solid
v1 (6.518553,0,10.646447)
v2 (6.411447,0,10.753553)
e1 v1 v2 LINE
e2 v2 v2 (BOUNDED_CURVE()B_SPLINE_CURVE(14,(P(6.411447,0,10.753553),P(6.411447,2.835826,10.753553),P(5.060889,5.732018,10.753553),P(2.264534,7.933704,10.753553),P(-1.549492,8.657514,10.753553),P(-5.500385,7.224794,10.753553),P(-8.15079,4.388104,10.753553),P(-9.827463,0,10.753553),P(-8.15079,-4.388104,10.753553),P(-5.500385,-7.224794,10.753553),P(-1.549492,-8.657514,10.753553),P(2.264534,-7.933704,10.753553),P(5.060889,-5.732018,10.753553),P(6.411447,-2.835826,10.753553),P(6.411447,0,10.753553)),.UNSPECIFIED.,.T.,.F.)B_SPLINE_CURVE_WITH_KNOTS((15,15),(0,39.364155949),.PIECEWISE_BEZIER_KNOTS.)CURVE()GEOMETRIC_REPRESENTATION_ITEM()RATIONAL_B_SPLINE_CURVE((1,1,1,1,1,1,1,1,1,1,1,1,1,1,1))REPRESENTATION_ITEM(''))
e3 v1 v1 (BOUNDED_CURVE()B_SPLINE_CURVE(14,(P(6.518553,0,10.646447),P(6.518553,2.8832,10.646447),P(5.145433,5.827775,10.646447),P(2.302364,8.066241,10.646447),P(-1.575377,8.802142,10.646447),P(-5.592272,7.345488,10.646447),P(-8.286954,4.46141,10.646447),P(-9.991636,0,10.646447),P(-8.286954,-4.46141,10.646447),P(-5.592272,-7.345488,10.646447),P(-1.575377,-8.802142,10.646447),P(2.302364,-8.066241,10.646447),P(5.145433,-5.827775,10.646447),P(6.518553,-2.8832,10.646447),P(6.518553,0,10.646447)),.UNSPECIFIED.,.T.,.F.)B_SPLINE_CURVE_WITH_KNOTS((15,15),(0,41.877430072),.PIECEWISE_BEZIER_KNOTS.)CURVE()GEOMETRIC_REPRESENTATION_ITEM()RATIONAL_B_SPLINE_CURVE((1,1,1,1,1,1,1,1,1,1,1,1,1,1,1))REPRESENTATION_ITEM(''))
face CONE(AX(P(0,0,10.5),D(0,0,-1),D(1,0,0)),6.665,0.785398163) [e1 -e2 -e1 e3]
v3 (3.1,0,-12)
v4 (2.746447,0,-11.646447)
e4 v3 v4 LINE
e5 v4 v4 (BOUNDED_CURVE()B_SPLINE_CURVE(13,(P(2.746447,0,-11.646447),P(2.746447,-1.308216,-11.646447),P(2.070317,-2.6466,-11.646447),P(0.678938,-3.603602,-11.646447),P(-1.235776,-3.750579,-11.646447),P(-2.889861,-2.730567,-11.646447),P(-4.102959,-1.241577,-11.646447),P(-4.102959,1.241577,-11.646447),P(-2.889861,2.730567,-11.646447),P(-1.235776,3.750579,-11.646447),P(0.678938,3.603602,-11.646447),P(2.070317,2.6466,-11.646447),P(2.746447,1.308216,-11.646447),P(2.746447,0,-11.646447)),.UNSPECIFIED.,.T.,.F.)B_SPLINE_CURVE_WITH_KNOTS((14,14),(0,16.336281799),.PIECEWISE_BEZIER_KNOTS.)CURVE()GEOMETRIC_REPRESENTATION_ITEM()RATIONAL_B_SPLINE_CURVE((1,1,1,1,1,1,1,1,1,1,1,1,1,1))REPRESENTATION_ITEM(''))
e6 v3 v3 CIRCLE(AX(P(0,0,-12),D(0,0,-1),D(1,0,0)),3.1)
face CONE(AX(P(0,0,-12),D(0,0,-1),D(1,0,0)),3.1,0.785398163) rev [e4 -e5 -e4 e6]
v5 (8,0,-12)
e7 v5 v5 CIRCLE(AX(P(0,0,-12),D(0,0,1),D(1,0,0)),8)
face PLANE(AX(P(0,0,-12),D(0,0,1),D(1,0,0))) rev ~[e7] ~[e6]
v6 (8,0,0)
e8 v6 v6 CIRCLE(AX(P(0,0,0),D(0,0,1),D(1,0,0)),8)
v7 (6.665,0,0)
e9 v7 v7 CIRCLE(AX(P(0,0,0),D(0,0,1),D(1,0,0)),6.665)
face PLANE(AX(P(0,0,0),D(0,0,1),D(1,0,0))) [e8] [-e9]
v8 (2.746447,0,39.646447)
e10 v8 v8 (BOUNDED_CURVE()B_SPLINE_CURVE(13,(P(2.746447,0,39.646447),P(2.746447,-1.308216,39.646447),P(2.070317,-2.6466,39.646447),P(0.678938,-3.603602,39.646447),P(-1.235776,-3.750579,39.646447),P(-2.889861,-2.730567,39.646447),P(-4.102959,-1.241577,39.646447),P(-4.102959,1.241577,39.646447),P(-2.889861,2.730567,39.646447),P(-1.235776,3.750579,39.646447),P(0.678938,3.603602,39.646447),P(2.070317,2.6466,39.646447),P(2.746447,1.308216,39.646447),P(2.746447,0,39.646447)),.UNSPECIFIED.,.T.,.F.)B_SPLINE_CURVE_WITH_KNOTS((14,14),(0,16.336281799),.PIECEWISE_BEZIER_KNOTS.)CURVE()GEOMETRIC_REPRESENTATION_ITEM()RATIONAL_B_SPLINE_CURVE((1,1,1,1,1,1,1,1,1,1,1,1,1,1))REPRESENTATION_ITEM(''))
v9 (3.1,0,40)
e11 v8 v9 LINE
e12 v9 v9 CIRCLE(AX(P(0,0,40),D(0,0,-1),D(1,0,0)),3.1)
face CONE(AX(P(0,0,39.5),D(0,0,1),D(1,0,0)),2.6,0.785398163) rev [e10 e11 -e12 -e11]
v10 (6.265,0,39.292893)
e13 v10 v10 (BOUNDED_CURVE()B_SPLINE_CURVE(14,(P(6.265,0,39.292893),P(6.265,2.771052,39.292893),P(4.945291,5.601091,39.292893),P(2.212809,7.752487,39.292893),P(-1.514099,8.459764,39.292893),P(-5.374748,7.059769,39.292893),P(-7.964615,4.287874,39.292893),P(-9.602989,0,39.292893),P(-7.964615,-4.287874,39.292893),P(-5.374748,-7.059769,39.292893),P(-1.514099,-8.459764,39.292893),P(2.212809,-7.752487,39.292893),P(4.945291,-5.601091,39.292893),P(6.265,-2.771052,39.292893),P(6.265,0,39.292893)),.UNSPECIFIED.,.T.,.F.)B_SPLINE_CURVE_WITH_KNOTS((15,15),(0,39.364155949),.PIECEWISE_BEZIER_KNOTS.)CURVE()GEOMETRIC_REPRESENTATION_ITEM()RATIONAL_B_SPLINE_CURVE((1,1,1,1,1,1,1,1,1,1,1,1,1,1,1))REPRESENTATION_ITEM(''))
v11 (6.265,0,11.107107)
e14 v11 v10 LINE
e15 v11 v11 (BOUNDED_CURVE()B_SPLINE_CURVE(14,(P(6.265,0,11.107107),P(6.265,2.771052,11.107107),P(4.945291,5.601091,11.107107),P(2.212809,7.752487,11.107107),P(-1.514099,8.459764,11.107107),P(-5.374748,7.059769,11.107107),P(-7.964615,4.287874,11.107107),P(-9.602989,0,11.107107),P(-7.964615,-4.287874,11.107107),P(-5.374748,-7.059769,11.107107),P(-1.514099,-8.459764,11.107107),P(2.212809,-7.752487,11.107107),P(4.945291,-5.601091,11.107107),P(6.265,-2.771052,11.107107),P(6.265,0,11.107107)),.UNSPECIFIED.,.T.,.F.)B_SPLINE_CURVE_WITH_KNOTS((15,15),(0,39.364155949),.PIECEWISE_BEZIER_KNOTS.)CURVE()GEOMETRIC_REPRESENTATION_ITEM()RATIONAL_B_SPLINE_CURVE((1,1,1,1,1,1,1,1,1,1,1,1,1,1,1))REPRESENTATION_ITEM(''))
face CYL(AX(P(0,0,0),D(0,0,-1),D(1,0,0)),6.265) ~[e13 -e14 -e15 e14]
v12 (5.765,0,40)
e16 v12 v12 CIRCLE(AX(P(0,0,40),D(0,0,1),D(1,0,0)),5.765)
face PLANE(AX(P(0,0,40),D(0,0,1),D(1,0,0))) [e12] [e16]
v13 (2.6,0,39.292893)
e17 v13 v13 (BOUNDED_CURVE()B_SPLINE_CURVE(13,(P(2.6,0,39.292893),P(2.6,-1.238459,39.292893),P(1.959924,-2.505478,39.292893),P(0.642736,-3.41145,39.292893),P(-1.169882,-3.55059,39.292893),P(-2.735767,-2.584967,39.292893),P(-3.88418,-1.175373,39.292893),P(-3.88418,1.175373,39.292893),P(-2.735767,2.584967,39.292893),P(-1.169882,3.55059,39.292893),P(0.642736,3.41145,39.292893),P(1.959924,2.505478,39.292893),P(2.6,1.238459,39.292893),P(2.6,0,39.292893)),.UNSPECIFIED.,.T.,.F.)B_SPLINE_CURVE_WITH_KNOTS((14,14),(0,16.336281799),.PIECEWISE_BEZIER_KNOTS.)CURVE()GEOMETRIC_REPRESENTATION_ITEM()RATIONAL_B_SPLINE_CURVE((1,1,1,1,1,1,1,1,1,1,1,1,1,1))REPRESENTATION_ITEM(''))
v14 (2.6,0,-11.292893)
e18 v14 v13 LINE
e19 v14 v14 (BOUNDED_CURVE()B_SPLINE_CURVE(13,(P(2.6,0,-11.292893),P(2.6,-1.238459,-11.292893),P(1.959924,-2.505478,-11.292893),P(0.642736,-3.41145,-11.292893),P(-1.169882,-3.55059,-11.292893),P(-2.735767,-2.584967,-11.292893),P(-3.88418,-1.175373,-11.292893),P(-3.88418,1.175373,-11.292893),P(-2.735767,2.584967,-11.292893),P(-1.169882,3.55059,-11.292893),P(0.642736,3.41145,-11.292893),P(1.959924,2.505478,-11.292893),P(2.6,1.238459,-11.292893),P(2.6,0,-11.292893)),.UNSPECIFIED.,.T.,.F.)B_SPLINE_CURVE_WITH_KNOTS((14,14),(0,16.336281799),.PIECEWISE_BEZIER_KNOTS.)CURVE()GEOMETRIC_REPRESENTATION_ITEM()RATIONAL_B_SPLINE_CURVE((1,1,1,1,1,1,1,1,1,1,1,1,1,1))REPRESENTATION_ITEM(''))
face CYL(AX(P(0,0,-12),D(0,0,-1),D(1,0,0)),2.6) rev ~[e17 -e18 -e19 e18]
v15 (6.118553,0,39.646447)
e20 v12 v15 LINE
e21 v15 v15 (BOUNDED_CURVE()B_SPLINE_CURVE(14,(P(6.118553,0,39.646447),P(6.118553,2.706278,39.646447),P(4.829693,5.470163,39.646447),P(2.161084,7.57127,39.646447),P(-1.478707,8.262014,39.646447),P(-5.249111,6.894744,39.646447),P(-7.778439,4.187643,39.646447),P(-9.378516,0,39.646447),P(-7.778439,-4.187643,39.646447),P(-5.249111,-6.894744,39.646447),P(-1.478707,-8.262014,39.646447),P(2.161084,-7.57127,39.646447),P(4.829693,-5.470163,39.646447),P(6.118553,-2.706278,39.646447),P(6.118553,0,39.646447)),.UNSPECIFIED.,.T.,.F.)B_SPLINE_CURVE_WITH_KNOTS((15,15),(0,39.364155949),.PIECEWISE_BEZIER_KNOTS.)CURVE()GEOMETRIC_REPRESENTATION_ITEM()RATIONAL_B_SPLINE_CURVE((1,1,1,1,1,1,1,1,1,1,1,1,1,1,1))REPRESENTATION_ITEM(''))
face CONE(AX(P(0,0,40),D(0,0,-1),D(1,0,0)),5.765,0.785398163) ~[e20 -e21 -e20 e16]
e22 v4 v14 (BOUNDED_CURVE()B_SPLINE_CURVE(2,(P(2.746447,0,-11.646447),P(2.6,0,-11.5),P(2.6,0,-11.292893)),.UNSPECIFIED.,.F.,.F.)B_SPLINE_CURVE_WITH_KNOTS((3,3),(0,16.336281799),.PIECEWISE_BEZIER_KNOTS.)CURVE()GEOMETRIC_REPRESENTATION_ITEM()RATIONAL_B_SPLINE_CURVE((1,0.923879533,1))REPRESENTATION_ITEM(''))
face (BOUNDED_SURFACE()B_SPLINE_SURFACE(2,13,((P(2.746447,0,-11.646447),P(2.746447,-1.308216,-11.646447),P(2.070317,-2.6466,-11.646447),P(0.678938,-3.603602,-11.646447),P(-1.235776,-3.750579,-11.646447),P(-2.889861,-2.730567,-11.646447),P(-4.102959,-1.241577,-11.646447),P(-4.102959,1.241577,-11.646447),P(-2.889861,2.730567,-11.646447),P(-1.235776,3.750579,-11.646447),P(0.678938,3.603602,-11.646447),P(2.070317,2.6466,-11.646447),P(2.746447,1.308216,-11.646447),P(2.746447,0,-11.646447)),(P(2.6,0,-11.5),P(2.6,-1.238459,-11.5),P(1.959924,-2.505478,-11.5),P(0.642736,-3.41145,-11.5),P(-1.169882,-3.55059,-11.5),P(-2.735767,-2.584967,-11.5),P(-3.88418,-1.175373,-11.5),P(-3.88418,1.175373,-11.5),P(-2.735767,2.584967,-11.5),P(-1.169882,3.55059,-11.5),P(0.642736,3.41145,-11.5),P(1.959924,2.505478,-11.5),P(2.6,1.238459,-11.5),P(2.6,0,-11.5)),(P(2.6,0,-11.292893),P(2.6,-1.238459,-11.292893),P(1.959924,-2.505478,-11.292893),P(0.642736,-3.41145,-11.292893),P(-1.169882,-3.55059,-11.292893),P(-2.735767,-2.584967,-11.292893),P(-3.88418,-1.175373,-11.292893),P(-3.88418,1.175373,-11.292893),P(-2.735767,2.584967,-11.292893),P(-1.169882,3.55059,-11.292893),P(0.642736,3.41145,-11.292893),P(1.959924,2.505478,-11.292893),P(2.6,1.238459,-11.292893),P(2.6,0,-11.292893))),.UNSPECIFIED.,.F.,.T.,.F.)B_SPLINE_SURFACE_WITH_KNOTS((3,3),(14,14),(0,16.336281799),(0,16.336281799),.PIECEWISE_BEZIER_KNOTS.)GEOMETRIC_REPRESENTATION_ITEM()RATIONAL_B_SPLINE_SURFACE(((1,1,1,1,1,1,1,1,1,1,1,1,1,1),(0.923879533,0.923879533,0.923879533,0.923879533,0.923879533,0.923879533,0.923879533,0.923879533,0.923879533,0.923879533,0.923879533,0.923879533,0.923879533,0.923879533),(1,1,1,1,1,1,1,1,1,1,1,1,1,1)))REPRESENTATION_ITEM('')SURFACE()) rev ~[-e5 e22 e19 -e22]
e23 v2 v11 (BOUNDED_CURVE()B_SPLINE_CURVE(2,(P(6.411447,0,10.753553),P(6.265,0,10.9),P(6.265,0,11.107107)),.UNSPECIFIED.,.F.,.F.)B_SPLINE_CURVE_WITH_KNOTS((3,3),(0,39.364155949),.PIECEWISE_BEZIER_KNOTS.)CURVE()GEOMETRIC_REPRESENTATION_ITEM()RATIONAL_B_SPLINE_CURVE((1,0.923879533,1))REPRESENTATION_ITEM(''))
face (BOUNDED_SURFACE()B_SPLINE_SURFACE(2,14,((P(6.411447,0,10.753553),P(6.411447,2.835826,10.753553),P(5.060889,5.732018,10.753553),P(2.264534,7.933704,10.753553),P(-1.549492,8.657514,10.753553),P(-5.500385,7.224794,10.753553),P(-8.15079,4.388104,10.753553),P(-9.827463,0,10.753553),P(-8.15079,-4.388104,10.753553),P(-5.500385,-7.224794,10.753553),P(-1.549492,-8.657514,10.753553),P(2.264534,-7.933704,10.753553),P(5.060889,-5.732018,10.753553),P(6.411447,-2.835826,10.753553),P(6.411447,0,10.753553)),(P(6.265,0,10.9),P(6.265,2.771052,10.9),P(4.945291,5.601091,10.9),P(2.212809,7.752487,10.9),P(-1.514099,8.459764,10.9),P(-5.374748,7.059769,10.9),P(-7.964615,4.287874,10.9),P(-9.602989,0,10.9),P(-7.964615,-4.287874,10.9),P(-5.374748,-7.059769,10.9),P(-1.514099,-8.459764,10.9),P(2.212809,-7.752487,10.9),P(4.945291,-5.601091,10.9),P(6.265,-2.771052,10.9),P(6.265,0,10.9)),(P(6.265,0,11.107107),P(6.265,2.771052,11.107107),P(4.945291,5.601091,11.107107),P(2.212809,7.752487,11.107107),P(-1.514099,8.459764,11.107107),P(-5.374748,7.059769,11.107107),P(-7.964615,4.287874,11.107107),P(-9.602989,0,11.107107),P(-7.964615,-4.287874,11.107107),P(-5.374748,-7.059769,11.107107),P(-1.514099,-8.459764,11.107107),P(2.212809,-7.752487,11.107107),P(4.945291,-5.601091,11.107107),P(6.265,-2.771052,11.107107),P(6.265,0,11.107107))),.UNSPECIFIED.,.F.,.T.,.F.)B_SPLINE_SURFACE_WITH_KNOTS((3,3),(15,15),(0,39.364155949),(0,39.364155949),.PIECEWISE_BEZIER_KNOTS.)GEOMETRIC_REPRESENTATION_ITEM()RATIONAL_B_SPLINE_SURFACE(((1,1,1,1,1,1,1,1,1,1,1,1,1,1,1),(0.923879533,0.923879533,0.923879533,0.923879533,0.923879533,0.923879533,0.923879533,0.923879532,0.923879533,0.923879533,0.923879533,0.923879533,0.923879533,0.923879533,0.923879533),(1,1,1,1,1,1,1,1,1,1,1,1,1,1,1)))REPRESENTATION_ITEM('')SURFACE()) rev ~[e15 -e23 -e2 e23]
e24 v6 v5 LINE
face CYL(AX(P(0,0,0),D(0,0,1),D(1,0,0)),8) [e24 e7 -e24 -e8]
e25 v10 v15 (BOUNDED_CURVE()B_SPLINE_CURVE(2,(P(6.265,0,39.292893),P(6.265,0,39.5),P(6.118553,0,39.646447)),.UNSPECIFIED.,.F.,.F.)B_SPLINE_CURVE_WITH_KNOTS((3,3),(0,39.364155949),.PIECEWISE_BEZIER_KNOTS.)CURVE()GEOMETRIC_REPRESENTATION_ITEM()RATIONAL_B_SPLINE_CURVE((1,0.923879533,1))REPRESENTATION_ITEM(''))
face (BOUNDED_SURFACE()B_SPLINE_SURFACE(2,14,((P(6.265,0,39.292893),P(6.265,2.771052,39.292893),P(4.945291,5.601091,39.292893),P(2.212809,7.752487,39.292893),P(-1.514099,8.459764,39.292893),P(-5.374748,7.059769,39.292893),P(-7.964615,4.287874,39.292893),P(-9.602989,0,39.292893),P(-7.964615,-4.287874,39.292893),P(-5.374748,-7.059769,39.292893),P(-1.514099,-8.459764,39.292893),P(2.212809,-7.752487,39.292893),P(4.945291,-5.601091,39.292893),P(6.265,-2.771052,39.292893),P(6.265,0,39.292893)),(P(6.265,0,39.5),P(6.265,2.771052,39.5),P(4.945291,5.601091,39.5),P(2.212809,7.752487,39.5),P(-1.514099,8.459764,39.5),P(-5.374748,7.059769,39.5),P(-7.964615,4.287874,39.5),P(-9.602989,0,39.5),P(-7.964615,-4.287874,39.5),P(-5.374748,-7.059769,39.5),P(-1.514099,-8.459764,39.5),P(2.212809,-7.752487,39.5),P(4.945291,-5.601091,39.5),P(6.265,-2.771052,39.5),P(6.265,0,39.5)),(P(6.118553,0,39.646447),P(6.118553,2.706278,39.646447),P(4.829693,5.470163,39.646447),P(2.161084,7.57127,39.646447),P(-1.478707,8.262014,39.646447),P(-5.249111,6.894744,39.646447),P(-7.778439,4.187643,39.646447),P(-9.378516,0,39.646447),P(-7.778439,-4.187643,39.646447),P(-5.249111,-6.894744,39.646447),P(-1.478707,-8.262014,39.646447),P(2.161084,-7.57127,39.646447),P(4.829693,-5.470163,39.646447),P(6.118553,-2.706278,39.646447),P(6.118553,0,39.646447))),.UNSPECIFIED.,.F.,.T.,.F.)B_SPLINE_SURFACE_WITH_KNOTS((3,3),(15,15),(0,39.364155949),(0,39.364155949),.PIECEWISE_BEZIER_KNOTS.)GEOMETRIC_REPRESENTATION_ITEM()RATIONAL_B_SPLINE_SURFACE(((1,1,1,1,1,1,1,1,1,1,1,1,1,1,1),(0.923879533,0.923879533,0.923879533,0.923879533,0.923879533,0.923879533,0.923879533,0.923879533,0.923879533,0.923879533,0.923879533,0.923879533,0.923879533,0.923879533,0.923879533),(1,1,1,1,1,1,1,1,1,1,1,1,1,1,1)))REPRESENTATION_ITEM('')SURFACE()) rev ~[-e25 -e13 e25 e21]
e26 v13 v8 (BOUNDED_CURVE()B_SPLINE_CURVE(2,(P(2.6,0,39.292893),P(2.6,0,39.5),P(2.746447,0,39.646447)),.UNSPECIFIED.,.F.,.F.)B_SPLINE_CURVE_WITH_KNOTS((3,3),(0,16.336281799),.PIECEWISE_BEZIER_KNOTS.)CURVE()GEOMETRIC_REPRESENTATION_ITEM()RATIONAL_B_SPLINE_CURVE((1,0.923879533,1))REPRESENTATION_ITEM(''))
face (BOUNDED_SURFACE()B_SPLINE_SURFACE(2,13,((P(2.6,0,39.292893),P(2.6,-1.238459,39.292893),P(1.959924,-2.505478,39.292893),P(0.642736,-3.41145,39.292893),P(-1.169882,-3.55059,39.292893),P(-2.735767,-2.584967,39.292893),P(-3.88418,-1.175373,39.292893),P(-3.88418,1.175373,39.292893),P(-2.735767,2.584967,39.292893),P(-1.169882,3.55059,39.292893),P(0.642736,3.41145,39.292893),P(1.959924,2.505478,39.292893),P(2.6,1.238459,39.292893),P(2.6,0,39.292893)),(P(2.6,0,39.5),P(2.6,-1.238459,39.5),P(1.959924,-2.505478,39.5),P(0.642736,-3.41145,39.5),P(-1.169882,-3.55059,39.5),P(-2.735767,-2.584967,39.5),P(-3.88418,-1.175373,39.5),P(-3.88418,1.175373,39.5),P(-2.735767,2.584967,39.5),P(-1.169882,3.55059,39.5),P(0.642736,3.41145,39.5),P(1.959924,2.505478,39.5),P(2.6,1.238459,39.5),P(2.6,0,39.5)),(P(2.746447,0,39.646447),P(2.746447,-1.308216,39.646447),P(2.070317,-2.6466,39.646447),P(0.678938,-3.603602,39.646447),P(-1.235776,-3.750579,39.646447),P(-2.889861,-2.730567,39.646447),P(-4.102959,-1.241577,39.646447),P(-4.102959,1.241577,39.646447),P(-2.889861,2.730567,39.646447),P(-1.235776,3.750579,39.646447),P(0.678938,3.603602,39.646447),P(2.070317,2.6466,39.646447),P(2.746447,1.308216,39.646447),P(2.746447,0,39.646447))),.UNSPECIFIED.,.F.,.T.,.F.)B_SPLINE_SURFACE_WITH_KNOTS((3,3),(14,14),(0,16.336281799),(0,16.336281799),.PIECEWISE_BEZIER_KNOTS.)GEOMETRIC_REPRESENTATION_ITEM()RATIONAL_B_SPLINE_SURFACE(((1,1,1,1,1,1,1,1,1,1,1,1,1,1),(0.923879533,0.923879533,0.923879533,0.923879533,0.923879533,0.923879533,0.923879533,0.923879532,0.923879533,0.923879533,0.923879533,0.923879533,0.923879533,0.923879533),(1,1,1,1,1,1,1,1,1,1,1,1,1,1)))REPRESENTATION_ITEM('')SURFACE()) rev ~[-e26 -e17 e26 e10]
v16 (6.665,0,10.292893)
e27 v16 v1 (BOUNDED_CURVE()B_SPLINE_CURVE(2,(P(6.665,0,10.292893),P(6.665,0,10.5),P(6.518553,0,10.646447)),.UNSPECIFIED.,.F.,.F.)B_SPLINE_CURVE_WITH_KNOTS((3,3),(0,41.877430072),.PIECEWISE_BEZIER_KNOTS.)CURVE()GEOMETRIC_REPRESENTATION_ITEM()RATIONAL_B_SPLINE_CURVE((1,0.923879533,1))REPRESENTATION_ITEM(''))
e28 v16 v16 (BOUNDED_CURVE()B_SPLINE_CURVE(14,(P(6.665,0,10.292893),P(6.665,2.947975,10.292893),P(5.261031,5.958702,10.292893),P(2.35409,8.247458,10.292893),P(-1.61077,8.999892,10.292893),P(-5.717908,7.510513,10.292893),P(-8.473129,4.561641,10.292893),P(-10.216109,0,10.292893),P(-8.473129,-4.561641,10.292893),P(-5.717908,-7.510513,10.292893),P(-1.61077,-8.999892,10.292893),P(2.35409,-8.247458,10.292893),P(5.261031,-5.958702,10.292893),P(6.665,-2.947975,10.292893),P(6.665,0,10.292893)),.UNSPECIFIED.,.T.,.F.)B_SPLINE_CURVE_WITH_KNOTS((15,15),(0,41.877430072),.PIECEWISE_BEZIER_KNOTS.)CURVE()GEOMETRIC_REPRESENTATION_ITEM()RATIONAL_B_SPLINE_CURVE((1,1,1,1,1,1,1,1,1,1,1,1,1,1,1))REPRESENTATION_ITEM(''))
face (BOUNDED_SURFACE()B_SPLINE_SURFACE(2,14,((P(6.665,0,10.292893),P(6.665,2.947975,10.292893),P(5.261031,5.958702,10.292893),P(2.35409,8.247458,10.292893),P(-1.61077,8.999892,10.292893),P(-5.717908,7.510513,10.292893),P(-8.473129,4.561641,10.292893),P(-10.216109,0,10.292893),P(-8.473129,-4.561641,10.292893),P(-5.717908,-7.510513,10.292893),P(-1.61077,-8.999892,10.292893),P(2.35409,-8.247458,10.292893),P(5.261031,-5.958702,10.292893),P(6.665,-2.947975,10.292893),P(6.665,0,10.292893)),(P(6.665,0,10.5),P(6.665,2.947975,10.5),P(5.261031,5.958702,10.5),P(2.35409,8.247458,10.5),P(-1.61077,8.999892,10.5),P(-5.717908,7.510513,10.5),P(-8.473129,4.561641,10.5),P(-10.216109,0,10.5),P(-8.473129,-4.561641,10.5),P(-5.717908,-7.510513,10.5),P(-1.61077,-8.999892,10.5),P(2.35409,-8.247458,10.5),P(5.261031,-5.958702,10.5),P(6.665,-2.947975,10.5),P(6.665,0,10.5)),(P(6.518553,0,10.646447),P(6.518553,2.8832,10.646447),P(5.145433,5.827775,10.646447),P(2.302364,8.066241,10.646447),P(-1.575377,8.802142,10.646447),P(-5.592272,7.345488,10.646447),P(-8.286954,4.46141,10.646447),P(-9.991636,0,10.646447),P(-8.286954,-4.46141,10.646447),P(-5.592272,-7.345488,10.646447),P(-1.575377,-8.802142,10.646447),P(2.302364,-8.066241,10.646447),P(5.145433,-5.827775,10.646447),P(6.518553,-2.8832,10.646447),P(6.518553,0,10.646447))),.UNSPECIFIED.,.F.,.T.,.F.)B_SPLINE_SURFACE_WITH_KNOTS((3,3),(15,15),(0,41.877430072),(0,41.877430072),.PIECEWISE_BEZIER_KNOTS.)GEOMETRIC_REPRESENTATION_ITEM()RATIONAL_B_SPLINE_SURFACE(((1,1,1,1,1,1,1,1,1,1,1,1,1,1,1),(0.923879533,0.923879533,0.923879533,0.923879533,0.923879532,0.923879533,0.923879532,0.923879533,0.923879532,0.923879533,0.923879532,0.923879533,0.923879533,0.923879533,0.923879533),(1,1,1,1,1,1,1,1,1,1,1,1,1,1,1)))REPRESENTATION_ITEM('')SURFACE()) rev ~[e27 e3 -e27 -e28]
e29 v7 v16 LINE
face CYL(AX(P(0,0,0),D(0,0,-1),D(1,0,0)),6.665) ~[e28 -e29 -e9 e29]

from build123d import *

# Parameters (mm, degrees)
F0_R        = 6.665
F0_R_2      = 6.265
F1_DEPTH    = 11
F2_DEPTH    = 40
F0_R_3      = 8
F3_DEPTH    = 12
F4_R        = 2.6
F5_DEPTH    = 52
F6_S5_R     = 6.265
F6_T6_DEPTH = 11
F7_R        = 0.5
F8_R        = 0.5


# Not quite as in the source:
# - a fillet or chamfer that OpenCascade refuses, or shapes differently, is made with other operations: its cross-section is extruded or revolved along the edge and cut away or added


with BuildPart() as f1:
    # F0 (on Top) → F1 (new body)
    with BuildSketch(Plane.XY):
        Circle(F0_R)
        Circle(F0_R_2, mode=Mode.SUBTRACT)
        Circle(F0_R_2)
    extrude(amount=F1_DEPTH)

    # F0 (on Top) → F2 (join)
    with BuildSketch(Plane.XY):
        Circle(F0_R_2)
    extrude(amount=F2_DEPTH)

    # F0 (on Top) → F3 (join)
    with BuildSketch(Plane.XY):
        Circle(F0_R_3)
        Circle(F0_R, mode=Mode.SUBTRACT)
        Circle(F0_R)
        Circle(F0_R_2, mode=Mode.SUBTRACT)
        Circle(F0_R_2)
    extrude(amount=-F3_DEPTH)

    # F4 (on face) → F5 (cut)
    with BuildSketch(Plane(origin=(0, 0, -12), x_dir=(1, 0, 0), z_dir=(0, 0, -1))):
        Circle(F4_R)
    extrude(amount=-F5_DEPTH, mode=Mode.SUBTRACT)

    # F6: chamfer of 0.5 on 4 edges, made by hand


with BuildPart() as f6_tool2:
    # F6_s3 → F6_t4 (revolve)
    with BuildSketch(Plane.XZ):
        Polygon((6.665, 10.5), (6.165, 11), (6.665, 11), align=None)
    revolve(axis=Axis((0, 0, 11), (0, 0, 1)))

    # F6_s5 → F6_t6 (cut, symmetric)
    with BuildSketch(Plane.XY.offset(10.8)):
        Circle(F6_S5_R)
    extrude(amount=F6_T6_DEPTH, both=True, mode=Mode.SUBTRACT)


with BuildPart() as f1_1:
    add(f1.part)

    # F6_t1: cut F6_tool2
    add(f6_tool2.part, mode=Mode.SUBTRACT)

    # F6_s7 → F6_t8 (revolve, cut)
    with BuildSketch(Plane.XZ):
        Polygon((5.765, 40), (6.265, 39.5), (6.265, 40), align=None)
    revolve(axis=Axis((0, 0, 40), (0, 0, 1)), mode=Mode.SUBTRACT)

    # F6_s9 → F6_t10 (revolve, cut)
    with BuildSketch(Plane.XZ):
        Polygon((2.6, 39.5), (3.1, 40), (2.6, 40), align=None)
    revolve(axis=Axis((0, 0, 40), (0, 0, -1)), mode=Mode.SUBTRACT)

    # F6_s11 → F6_t12 (revolve, cut)
    with BuildSketch(Plane.XZ):
        Polygon((3.1, -12), (2.6, -11.5), (2.6, -12), align=None)
    revolve(axis=Axis((0, 0, -12), (0, 0, -1)), mode=Mode.SUBTRACT)

    # F7
    f7_edges = [f1_1.edges().sort_by_distance(p)[0] for p in [
        (-6.665, 0, 10.5),
        (-6.265, 0, 39.5),
        (-2.6, 0, 39.5),
        (-2.6, 0, -11.5),
    ]]
    fillet(f7_edges, radius=F7_R)

    # F8
    f8_edges = [f1_1.edges().sort_by_distance(p)[0] for p in [
        (-6.265, 0, 10.9),
    ]]
    fillet(f8_edges, radius=F8_R)


solid = f1_1.part
